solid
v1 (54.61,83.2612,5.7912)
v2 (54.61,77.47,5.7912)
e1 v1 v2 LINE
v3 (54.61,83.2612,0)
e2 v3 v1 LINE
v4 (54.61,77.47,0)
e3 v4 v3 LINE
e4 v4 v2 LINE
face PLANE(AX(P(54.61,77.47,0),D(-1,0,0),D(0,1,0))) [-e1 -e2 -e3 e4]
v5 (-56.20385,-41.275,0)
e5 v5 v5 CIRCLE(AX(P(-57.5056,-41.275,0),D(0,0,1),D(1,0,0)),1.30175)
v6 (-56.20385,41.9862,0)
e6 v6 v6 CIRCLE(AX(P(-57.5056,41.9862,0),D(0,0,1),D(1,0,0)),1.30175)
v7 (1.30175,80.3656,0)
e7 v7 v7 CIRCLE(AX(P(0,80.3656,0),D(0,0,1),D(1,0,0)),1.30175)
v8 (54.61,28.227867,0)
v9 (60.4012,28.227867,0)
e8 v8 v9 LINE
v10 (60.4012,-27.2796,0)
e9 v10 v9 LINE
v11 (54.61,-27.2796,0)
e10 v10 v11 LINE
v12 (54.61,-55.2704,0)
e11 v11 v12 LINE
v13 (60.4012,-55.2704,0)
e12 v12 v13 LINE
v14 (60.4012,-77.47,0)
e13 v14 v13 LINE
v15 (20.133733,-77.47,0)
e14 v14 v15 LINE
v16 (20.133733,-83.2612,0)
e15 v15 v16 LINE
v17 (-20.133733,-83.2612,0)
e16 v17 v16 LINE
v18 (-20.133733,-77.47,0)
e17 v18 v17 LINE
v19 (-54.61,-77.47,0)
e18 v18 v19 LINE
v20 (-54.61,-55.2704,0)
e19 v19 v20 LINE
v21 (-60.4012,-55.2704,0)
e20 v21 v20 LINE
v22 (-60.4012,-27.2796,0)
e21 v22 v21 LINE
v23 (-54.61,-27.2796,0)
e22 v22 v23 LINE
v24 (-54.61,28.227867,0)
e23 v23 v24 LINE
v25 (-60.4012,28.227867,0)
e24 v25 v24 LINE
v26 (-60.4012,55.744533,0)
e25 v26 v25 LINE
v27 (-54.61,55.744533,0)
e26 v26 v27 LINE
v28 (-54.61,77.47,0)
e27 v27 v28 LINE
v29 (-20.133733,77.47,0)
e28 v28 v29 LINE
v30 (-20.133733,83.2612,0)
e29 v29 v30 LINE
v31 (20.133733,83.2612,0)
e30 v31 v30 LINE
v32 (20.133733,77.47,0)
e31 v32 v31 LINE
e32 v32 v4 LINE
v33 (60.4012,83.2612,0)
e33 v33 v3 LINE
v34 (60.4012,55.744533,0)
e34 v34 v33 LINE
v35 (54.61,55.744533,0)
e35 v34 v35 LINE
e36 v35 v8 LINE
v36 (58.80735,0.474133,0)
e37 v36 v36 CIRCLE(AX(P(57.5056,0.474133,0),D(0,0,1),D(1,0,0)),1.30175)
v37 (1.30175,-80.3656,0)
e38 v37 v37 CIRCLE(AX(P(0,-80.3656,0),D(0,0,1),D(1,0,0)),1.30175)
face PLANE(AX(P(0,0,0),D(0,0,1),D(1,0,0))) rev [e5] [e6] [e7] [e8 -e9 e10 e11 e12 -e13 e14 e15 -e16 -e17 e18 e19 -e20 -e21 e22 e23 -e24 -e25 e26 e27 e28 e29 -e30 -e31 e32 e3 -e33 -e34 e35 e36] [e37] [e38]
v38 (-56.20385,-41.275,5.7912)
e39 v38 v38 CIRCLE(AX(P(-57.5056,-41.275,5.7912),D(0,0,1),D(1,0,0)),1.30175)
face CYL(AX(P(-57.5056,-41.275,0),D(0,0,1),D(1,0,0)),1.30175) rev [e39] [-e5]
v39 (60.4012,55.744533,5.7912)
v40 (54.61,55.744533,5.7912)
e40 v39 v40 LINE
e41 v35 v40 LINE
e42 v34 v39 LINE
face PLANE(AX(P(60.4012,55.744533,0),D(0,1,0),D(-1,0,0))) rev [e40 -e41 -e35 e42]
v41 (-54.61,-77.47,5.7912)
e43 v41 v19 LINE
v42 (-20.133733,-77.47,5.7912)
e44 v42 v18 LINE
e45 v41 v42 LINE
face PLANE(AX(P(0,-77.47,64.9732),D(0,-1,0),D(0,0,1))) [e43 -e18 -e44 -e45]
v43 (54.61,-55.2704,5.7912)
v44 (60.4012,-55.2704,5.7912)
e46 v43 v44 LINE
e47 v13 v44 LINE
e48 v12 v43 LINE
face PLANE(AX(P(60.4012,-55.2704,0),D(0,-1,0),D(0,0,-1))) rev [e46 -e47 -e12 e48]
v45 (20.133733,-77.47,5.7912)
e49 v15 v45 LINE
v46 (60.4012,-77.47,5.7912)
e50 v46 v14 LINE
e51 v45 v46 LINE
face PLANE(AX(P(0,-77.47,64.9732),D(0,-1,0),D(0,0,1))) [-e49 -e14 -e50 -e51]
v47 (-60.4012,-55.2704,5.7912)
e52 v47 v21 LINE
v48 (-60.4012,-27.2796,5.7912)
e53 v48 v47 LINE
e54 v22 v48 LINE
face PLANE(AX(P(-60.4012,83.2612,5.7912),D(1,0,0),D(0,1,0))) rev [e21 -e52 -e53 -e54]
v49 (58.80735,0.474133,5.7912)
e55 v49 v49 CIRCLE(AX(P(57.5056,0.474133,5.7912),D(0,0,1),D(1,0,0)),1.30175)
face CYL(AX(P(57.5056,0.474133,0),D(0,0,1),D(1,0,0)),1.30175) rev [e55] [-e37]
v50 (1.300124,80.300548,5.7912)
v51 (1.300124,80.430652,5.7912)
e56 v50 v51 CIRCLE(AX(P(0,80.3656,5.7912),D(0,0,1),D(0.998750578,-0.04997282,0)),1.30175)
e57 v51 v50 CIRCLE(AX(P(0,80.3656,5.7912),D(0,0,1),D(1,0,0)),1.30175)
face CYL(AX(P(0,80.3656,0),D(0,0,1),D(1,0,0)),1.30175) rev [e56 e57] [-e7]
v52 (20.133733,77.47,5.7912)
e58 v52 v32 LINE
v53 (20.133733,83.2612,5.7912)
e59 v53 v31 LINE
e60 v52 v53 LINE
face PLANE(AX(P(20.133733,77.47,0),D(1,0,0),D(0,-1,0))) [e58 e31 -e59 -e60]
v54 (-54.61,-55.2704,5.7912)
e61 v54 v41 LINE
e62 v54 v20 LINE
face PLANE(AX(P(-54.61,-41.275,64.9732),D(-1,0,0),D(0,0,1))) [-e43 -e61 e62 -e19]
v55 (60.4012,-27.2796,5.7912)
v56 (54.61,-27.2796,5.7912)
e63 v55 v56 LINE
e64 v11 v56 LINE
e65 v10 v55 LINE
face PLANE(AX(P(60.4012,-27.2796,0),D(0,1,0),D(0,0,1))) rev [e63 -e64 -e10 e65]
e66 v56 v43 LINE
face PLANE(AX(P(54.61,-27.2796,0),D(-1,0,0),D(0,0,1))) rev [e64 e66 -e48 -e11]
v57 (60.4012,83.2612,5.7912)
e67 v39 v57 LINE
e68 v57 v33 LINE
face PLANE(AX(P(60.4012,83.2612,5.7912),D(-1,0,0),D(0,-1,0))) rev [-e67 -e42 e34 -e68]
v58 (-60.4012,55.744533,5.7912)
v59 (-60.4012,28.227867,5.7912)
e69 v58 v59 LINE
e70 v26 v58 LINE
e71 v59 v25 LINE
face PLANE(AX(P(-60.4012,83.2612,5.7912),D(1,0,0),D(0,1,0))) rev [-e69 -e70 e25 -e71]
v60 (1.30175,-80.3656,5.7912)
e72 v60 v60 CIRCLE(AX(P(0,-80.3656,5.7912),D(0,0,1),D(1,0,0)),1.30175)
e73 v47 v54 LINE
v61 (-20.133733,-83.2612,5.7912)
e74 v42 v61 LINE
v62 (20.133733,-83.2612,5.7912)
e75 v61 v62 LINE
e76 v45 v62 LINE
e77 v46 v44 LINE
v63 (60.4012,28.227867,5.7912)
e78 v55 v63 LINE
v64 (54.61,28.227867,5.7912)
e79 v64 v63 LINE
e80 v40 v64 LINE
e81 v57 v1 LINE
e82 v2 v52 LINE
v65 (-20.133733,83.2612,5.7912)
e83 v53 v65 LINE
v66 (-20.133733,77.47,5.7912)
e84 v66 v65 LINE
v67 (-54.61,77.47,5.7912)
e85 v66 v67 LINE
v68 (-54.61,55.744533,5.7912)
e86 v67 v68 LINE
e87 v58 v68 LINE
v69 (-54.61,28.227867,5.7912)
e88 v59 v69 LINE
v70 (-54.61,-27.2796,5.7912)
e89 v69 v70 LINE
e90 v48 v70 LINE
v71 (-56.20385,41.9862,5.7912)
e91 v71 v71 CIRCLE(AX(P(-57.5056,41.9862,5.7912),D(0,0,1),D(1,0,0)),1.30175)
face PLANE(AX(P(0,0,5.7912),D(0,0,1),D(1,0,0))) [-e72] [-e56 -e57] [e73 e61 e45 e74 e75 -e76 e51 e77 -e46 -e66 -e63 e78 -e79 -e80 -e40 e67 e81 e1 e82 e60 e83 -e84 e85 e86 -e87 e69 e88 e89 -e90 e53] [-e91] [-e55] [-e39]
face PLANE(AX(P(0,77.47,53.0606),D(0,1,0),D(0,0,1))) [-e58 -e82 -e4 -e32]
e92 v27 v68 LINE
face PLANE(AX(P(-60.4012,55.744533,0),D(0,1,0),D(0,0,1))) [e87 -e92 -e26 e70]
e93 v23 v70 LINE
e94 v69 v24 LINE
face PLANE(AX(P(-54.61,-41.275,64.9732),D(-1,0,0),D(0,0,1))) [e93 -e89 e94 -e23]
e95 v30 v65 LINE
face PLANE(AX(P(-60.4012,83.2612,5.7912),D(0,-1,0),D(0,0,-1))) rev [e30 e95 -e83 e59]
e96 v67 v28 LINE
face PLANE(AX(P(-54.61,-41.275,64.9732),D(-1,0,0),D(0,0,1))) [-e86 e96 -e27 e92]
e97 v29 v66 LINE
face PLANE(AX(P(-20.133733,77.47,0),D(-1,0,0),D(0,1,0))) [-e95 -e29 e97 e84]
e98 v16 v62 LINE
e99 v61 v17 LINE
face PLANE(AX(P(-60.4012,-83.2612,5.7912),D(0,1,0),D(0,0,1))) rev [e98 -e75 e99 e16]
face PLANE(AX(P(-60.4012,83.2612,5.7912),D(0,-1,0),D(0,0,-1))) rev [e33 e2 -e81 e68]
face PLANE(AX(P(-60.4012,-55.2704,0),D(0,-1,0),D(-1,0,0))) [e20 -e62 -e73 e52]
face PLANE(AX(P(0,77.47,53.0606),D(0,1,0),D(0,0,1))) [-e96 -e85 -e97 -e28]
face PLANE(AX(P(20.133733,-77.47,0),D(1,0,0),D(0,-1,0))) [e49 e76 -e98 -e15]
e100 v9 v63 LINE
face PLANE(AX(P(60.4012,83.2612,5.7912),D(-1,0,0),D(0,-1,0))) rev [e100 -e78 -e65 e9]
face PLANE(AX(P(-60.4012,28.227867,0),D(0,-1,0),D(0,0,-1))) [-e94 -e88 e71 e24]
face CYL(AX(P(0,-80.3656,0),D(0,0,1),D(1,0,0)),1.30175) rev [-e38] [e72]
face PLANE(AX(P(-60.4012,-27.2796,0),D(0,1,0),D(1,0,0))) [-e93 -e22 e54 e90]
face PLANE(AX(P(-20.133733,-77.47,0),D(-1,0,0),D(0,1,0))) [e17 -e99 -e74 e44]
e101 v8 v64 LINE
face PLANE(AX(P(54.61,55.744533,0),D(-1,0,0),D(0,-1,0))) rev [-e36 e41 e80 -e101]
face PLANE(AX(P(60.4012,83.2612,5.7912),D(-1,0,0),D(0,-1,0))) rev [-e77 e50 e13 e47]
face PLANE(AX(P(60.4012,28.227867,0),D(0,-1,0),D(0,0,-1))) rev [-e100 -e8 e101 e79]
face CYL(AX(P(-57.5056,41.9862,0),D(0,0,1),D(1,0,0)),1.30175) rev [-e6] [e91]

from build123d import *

# Parameters (mm, degrees)
SKETCH1_W             = 120.8024
SKETCH1_H             = 166.5224
BOSS_EXTRUDE1_DEPTH   = 5.7912
SKETCH7_R             = 1.30175
CUT_EXTRUDE6_DEPTH    = 104.025581213
SKETCH9_W             = 5.7912
SKETCH9_H             = 27.9908
CUT_EXTRUDE7_DEPTH    = 104.025581213
SKETCH10_W            = 5.7912
SKETCH10_H            = 27.516666666
CUT_EXTRUDE8_DEPTH    = 104.025581213
SKETCH11_R            = 1.30175
CUT_EXTRUDE9_DEPTH    = 104.025581213
SKETCH12_R            = 1.30175
CUT_EXTRUDE10_DEPTH   = 104.025581213
CAVITY2_START         = -83.2612
CAVITY2_OUTLINE_W     = 40.267466667
CAVITY2_OUTLINE_H     = 5.7912
CAVITY2_DEPTH         = 5.7912
CAVITY2_START_2       = 77.47
CAVITY2_2_OUTLINE_W   = 40.267466667
CAVITY2_2_OUTLINE_H   = 5.7912
CAVITY2_2_OUTLINE_W_2 = 34.476266667
CAVITY2_2_DEPTH       = 5.7912
CAVITY2_START_3       = -27.2796
CAVITY2_3_OUTLINE_W   = 5.7912
CAVITY2_3_OUTLINE_H   = 5.7912
CAVITY2_3_DEPTH       = 55.507466667
CAVITY2_START_4       = -77.47
CAVITY2_4_OUTLINE_W   = 5.7912
CAVITY2_4_OUTLINE_H   = 5.7912
CAVITY2_4_DEPTH       = 22.1996
CAVITY2_START_5       = 55.744533333
CAVITY2_5_OUTLINE_W   = 5.7912
CAVITY2_5_OUTLINE_H   = 5.7912
CAVITY2_5_DEPTH       = 21.725466667


# Read off the part's stored shape, not the designer's step: Cavity2
with BuildPart() as part:
    # Sketch1 → Boss-Extrude1 (new body)
    with BuildSketch(Plane.XY):
        Rectangle(SKETCH1_W, SKETCH1_H)
    extrude(amount=BOSS_EXTRUDE1_DEPTH)

    # Sketch7 → Cut-Extrude6 (cut, through all)
    with BuildSketch(Plane.XY.offset(5.7912)):
        with Locations((-57.5056, -41.275)):
            Circle(SKETCH7_R)
        with Locations((-57.5056, 41.9862)):
            Circle(SKETCH7_R)
        with Locations(Location((58.473654732, -41.275, 0), (0, 0, 180))):
            Circle(SKETCH7_R)
        with Locations(Location((58.473654732, 41.9862, 0), (0, 0, 180))):
            Circle(SKETCH7_R)
    extrude(amount=-CUT_EXTRUDE6_DEPTH, mode=Mode.SUBTRACT)

    # Sketch9 → Cut-Extrude7 (cut, through all)
    with BuildSketch(Plane.XY.offset(5.7912)):
        with Locations((57.5056, -41.275)):
            Rectangle(SKETCH9_W, SKETCH9_H)
    extrude(amount=-CUT_EXTRUDE7_DEPTH, mode=Mode.SUBTRACT)

    # Sketch10 → Cut-Extrude8 (cut, through all)
    with BuildSketch(Plane.XY.offset(5.7912)):
        with Locations((57.5056, 41.9862)):
            Rectangle(SKETCH10_W, SKETCH10_H)
    extrude(amount=-CUT_EXTRUDE8_DEPTH, mode=Mode.SUBTRACT)

    # Sketch11 → Cut-Extrude9 (cut, through all)
    with BuildSketch(Plane.XY.offset(5.7912)):
        with Locations((57.5056, 0.474133333)):
            Circle(SKETCH11_R)
    extrude(amount=-CUT_EXTRUDE9_DEPTH, mode=Mode.SUBTRACT)

    # Sketch12 → Cut-Extrude10 (cut, through all)
    with BuildSketch(Plane.XY.offset(5.7912)):
        with Locations((0, 80.3656)):
            Circle(SKETCH12_R)
        with Locations((0, -80.3656)):
            Circle(SKETCH12_R)
    extrude(amount=-CUT_EXTRUDE10_DEPTH, mode=Mode.SUBTRACT)

    # Cavity2 outline → Cavity2 (cut)
    with BuildSketch(Plane(origin=(0, 0, 0), x_dir=(1, 0, 0), z_dir=(0, 1, 0)).offset(CAVITY2_START)):
        with Locations((-40.267466666, -2.8956)):
            Rectangle(CAVITY2_OUTLINE_W, CAVITY2_OUTLINE_H)
        with Locations((40.267466666, -2.8956)):
            Rectangle(CAVITY2_OUTLINE_W, CAVITY2_OUTLINE_H)
    extrude(amount=CAVITY2_DEPTH, mode=Mode.SUBTRACT)

    # Cavity2 2 outline → Cavity2 2 (cut)
    with BuildSketch(Plane(origin=(0, 0, 0), x_dir=(1, 0, 0), z_dir=(0, 1, 0)).offset(CAVITY2_START_2)):
        with Locations((-40.267466666, -2.8956)):
            Rectangle(CAVITY2_2_OUTLINE_W, CAVITY2_2_OUTLINE_H)
        with Locations((37.371866667, -2.8956)):
            Rectangle(CAVITY2_2_OUTLINE_W_2, CAVITY2_2_OUTLINE_H)
    extrude(amount=CAVITY2_2_DEPTH, mode=Mode.SUBTRACT)

    # Cavity2 3 outline → Cavity2 3 (cut)
    with BuildSketch(Plane(origin=(0, 0, 0), x_dir=(1, 0, 0), z_dir=(0, 1, 0)).offset(CAVITY2_START_3)):
        with Locations((-57.5056, -2.8956)):
            Rectangle(CAVITY2_3_OUTLINE_W, CAVITY2_3_OUTLINE_H)
    extrude(amount=CAVITY2_3_DEPTH, mode=Mode.SUBTRACT)

    # Cavity2 4 outline → Cavity2 4 (cut)
    with BuildSketch(Plane(origin=(0, 0, 0), x_dir=(1, 0, 0), z_dir=(0, 1, 0)).offset(CAVITY2_START_4)):
        with Locations((-57.5056, -2.8956)):
            Rectangle(CAVITY2_4_OUTLINE_W, CAVITY2_4_OUTLINE_H)
    extrude(amount=CAVITY2_4_DEPTH, mode=Mode.SUBTRACT)

    # Cavity2 5 outline → Cavity2 5 (cut)
    with BuildSketch(Plane(origin=(0, 0, 0), x_dir=(1, 0, 0), z_dir=(0, 1, 0)).offset(CAVITY2_START_5)):
        with Locations((-57.5056, -2.8956)):
            Rectangle(CAVITY2_5_OUTLINE_W, CAVITY2_5_OUTLINE_H)
    extrude(amount=CAVITY2_5_DEPTH, mode=Mode.SUBTRACT)


solid = part.part
